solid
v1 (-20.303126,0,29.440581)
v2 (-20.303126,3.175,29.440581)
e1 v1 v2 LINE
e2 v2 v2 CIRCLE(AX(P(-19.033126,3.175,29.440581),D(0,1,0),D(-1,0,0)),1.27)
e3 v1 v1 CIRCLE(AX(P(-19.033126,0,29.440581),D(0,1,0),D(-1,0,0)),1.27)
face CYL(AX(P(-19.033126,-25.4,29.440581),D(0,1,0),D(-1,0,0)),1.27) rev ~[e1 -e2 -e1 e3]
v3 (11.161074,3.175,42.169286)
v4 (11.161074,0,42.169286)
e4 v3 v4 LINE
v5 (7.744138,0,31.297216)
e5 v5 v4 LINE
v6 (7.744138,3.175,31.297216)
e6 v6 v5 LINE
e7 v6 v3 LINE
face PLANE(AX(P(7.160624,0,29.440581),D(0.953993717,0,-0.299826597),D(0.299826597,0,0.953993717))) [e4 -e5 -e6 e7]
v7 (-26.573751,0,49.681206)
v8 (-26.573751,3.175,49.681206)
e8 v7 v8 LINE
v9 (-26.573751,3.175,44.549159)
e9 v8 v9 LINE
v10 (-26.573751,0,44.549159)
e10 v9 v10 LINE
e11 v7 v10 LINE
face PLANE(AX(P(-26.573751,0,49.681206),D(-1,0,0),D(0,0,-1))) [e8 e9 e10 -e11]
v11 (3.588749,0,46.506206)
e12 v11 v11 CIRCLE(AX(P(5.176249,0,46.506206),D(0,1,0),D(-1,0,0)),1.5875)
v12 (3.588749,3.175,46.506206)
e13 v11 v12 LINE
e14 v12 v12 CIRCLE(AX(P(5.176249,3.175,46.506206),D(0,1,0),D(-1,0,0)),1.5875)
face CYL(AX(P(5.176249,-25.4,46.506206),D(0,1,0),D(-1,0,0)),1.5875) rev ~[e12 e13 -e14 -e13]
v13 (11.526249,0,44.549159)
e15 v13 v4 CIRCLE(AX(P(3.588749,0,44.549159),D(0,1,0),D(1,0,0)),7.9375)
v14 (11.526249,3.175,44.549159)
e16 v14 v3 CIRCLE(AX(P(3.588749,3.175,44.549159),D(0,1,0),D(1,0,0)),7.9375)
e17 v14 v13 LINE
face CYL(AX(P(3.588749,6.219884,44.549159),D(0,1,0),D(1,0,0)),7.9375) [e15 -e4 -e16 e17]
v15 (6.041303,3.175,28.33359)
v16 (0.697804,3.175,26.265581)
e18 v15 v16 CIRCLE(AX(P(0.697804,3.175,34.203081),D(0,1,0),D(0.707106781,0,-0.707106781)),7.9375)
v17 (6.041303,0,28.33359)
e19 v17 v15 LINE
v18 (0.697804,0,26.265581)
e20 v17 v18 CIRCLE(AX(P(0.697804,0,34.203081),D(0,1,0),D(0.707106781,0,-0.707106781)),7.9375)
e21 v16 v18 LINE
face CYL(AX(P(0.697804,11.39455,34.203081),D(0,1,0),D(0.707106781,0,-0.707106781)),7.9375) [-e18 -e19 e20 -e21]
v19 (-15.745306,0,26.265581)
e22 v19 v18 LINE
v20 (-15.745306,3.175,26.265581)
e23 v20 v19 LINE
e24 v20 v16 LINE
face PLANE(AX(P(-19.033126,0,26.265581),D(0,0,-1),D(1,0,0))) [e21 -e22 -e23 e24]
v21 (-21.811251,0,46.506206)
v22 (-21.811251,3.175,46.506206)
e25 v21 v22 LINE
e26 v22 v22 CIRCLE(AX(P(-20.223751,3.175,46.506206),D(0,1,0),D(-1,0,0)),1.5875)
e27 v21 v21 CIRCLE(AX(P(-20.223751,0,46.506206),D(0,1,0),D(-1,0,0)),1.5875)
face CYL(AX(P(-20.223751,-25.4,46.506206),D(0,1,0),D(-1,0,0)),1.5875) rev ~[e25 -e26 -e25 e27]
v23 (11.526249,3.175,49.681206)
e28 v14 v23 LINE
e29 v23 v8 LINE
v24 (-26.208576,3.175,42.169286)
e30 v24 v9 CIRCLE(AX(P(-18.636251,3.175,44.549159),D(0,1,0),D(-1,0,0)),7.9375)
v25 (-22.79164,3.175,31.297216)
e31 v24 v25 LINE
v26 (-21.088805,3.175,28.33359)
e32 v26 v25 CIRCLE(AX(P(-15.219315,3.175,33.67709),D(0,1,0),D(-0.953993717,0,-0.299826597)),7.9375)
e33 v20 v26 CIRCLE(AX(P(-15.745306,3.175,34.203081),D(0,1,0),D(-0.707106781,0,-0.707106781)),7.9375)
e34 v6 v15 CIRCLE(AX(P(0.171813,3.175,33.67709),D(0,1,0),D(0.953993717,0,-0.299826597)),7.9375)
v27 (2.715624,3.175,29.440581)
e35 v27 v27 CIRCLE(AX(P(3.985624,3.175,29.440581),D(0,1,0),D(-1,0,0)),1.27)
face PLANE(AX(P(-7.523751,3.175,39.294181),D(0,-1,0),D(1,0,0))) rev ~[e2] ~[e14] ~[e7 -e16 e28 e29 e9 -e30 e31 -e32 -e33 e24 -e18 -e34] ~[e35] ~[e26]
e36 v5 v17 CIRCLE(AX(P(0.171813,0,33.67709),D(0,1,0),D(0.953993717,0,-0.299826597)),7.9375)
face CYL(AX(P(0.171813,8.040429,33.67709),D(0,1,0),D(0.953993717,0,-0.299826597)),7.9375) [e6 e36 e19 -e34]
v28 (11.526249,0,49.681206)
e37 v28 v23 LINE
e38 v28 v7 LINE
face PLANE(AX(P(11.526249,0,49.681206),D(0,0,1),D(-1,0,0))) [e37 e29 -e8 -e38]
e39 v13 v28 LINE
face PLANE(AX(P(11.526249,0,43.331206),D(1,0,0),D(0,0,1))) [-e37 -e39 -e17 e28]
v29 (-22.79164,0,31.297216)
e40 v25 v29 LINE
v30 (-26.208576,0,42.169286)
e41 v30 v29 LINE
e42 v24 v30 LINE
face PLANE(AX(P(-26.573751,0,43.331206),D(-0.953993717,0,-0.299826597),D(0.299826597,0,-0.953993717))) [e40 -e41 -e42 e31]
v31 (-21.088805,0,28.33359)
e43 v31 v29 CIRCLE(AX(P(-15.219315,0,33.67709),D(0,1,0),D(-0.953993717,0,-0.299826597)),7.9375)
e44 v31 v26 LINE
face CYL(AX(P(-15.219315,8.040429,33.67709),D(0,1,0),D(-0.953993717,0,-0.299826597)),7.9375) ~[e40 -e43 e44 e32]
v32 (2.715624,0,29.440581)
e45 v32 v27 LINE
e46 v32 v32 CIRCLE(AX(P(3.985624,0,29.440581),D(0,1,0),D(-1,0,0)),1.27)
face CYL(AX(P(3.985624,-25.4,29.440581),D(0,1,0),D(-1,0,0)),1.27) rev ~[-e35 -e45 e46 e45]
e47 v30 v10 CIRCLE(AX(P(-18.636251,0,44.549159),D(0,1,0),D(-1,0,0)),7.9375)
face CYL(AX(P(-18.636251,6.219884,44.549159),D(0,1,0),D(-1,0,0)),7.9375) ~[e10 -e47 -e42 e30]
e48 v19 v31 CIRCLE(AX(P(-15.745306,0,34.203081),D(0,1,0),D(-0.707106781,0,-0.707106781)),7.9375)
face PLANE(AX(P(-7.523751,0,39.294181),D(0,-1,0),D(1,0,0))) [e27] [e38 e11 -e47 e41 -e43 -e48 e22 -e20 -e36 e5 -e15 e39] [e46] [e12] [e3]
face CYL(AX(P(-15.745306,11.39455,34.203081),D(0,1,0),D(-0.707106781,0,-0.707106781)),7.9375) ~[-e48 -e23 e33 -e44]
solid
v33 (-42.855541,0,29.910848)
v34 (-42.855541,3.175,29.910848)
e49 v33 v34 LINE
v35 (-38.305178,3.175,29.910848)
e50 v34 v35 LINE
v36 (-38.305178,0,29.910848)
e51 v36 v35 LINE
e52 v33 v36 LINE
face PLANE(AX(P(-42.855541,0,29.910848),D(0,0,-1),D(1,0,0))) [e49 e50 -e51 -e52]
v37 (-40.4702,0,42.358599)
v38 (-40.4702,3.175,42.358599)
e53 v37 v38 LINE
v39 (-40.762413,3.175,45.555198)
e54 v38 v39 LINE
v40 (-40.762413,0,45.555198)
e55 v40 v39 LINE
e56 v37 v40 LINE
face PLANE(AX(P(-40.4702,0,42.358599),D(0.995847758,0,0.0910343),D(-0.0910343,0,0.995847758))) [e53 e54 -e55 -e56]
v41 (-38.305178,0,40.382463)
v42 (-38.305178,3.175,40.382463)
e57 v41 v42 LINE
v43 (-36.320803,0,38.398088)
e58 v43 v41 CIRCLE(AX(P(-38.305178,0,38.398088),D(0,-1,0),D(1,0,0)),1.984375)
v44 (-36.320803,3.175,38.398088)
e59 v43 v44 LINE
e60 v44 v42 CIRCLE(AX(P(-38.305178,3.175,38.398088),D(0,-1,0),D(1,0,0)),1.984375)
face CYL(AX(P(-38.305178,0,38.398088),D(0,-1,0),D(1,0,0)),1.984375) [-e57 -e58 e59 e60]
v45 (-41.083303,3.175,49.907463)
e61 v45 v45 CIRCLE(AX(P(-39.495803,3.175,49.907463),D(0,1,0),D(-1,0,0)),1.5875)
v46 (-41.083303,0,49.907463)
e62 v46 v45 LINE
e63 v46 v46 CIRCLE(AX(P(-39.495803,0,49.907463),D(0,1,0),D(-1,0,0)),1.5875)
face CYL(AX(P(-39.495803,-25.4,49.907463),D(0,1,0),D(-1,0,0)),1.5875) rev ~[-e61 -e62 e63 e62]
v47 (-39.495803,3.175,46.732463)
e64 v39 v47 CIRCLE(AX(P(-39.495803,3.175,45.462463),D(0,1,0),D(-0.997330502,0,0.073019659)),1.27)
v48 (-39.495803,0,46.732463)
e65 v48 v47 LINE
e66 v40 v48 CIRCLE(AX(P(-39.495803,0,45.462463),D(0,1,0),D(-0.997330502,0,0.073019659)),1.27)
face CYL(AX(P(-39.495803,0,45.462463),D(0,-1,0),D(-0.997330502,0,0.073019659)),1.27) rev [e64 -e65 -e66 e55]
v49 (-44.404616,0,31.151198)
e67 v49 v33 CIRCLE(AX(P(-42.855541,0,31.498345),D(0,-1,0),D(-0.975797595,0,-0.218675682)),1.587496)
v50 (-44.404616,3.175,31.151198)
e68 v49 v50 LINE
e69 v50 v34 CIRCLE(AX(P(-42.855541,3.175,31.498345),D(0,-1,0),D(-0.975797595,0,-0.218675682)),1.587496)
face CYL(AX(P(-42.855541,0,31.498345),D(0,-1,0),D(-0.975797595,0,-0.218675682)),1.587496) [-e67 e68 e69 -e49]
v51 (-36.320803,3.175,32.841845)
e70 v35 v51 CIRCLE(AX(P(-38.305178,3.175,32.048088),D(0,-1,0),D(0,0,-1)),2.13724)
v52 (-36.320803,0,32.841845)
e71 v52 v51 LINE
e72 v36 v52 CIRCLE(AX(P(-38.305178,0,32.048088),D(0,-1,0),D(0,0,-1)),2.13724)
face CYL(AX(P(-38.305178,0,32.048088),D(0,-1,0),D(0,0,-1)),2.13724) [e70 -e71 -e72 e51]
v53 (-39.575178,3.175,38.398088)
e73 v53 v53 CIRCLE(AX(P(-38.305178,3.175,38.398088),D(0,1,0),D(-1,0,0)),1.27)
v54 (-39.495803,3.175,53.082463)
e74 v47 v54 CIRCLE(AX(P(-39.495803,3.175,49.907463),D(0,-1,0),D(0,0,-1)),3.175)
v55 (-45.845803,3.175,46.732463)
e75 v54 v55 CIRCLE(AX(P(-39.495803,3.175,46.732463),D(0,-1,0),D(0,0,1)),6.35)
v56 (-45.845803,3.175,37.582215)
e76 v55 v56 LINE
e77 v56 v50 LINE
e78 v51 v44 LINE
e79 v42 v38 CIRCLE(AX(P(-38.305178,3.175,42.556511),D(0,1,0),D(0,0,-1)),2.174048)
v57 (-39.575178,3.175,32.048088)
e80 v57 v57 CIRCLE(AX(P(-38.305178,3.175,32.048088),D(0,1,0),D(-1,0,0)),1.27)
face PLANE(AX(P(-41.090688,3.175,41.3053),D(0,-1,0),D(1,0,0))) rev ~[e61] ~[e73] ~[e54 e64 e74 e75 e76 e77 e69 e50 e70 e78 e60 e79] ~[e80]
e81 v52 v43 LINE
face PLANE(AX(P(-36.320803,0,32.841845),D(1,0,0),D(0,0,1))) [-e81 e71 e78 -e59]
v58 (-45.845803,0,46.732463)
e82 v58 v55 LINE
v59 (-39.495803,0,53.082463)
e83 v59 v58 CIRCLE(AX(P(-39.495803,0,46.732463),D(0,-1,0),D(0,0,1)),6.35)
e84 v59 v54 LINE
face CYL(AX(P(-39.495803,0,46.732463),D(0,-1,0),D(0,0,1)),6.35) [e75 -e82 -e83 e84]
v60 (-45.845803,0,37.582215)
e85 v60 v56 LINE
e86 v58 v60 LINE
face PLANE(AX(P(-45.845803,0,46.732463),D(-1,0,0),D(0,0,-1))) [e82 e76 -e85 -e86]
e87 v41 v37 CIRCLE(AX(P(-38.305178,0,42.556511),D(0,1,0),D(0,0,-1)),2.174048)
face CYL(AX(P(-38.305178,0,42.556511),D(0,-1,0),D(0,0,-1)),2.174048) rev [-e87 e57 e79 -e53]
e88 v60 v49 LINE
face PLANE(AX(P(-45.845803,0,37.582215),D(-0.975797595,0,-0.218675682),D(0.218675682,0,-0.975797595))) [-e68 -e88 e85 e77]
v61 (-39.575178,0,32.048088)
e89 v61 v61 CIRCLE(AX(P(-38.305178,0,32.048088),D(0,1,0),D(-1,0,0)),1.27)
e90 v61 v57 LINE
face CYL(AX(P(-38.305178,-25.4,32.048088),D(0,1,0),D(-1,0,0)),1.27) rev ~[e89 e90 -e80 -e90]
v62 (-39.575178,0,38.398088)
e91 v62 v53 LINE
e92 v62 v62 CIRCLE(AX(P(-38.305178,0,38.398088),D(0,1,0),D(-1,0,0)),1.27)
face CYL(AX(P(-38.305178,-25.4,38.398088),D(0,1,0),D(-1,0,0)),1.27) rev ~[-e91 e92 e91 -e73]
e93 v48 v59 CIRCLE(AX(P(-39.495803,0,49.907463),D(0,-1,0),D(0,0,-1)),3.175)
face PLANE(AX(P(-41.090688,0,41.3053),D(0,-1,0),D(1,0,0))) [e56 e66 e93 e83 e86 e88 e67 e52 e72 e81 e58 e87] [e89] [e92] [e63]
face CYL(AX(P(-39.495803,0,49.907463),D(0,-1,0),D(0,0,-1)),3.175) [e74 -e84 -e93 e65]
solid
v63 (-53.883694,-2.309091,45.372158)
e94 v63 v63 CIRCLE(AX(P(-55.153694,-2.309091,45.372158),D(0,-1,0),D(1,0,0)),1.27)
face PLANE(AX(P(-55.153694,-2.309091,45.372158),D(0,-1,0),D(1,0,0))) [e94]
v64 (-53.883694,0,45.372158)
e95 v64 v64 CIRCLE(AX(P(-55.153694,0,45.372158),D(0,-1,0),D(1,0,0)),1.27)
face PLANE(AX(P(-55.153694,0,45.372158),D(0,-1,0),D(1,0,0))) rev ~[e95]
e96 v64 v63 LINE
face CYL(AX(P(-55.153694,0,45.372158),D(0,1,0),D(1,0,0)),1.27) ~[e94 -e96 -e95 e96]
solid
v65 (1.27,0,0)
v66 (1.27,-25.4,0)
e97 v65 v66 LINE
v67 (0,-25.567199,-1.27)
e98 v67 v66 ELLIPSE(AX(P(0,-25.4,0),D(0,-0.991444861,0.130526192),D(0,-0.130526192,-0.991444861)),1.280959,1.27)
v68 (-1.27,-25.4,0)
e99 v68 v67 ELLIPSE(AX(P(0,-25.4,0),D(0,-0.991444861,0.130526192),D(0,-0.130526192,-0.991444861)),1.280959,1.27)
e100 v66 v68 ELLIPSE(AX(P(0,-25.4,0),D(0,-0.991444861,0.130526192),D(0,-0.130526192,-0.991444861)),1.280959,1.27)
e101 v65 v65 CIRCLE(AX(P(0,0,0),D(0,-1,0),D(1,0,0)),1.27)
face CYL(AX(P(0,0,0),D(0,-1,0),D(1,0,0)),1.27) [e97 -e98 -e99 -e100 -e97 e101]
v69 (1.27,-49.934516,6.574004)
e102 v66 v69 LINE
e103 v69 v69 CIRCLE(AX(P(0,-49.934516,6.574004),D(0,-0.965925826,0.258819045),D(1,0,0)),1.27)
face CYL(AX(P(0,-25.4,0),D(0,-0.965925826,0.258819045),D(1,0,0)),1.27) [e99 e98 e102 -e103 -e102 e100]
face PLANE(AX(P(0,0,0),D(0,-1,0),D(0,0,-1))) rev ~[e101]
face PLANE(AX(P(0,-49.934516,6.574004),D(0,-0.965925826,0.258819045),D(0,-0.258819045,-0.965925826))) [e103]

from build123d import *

# Parameters (mm, degrees)
F1_DEPTH    = 3.175
F2_D        = 3.175
F2_DEPTH    = 25.4
F2_TIP      = 0.9538662327
F3_D        = 2.54
F3_DEPTH    = 25.4
F3_TIP      = 0.7630929862
F5_DEPTH    = 3.175
F6_D        = 3.175
F6_DEPTH    = 25.4
F6_TIP      = 0.9538662327
F7_D        = 2.54
F7_DEPTH    = 25.4
F7_TIP      = 0.7630929862
F8_T1_DEPTH = 19.6141007567
F8_T3_DEPTH = 12.9058575482
F8_T5_DEPTH = 9.2647678202
F9_R        = 1.27
F10_DEPTH   = 2.3090909091
F11_R       = 1.27


# Not quite as in the source:
# - a fillet or chamfer that OpenCascade refuses, or shapes differently, is made with other operations: its cross-section is extruded or revolved along the edge and cut away or added


with BuildPart() as f1:
    # F0 (on Front) → F1 (new body)
    with BuildSketch(Plane.XZ):
        with BuildLine():
            ThreePointArc((-40.7624131311, 45.5551980838), (-40.3604208215, 46.3926978741), (-39.4958033942, 46.7324631164))
            ThreePointArc((-39.4958033942, 46.7324631164), (-36.3208033942, 49.9074631164), (-39.4958033942, 53.0824631164))
            ThreePointArc((-39.4958033942, 53.0824631164), (-43.9859314547, 51.222591177), (-45.8458033942, 46.7324631164))
            Line((-45.8458033942, 46.7324631164), (-45.8458033942, 37.5822147164))
            Line((-45.8458033942, 37.5822147164), (-44.4046161923, 31.1511978093))
            ThreePointArc((-44.4046161923, 31.1511978093), (-43.8477734395, 30.2591434316), (-42.8555409547, 29.9108482117))
            Line((-42.8555409547, 29.9108482117), (-38.3051783942, 29.9108482117))
            ThreePointArc((-38.3051783942, 29.9108482117), (-36.5353982281, 30.8498925673), (-36.3208033942, 32.841845176))
            Line((-36.3208033942, 32.841845176), (-36.3208033942, 38.3980881164))
            ThreePointArc((-36.3208033942, 38.3980881164), (-36.9020133752, 39.8012531354), (-38.3051783942, 40.3824631164))
            ThreePointArc((-38.3051783942, 40.3824631164), (-39.7708205612, 40.950778212), (-40.4701995839, 42.3585985103))
            Line((-40.4701995839, 42.3585985103), (-40.7624131311, 45.5551980838))
        make_face()
    extrude(amount=-F1_DEPTH)

    # F2
    with Locations(Plane.XZ):
        with Locations((-39.4958033942, 49.9074631164)):
            Hole(F2_D / 2, depth=F2_DEPTH)
            with Locations((0, 0, -(F2_DEPTH + F2_TIP / 2))):  # 118° drill point
                Cone(0, F2_D / 2, F2_TIP, mode=Mode.SUBTRACT)

    # F3
    with Locations(Plane.XZ):
        with Locations((-38.3051783942, 38.3980881164), (-38.3051783942, 32.0480881164)):
            Hole(F3_D / 2, depth=F3_DEPTH)
            with Locations((0, 0, -(F3_DEPTH + F3_TIP / 2))):  # 118° drill point
                Cone(0, F3_D / 2, F3_TIP, mode=Mode.SUBTRACT)


with BuildPart() as f5:
    # F4 (on Front) → F5 (new body)
    with BuildSketch(Plane.XZ):
        Polygon((11.5262488782, 49.6812058449), (-26.5737511218, 49.6812058449), (-26.5737511218, 46.5062058449), (-26.5737511218, 43.3312058449), (-22.2081261218, 29.4405808449), (-19.0331261218, 26.2655808449), (3.9856238782, 26.2655808449), (7.1606238782, 29.4405808449), (11.5262488782, 43.3312058449), (11.5262488782, 46.5062058449), align=None)
    extrude(amount=-F5_DEPTH)

    # F6
    with Locations(Plane.XZ):
        with Locations((-20.2237511218, 46.5062058449), (5.1762488782, 46.5062058449)):
            Hole(F6_D / 2, depth=F6_DEPTH)
            with Locations((0, 0, -(F6_DEPTH + F6_TIP / 2))):  # 118° drill point
                Cone(0, F6_D / 2, F6_TIP, mode=Mode.SUBTRACT)

    # F7
    with Locations(Plane.XZ):
        with Locations((-19.0331261218, 29.4405808449), (3.9856238782, 29.4405808449)):
            Hole(F7_D / 2, depth=F7_DEPTH)
            with Locations((0, 0, -(F7_DEPTH + F7_TIP / 2))):  # 118° drill point
                Cone(0, F7_D / 2, F7_TIP, mode=Mode.SUBTRACT)

    # F8: fillet of radius 7.9375 on 6 edges, made by hand

    # F8_s2 → F8_t1 (cut)
    with BuildSketch(Plane.XZ.offset(-11.3945503783)):
        with BuildLine():
            ThreePointArc((6.3104638026, 28.5904207692), (3.7353534713, 26.8697870556), (0.6978037269, 26.2655808449))
            Line((0.6978037269, 26.2655808449), (3.9856238782, 26.2655808449))
            Line((3.9856238782, 26.2655808449), (6.3104638026, 28.5904207692))
        make_face()
        with BuildLine():
            ThreePointArc((-21.3579660461, 28.5904207692), (-18.7828557148, 26.8697870556), (-15.7453059704, 26.2655808449))
            Line((-15.7453059704, 26.2655808449), (-19.0331261218, 26.2655808449))
            Line((-19.0331261218, 26.2655808449), (-21.3579660461, 28.5904207692))
        make_face()
    extrude(amount=F8_T1_DEPTH, mode=Mode.SUBTRACT)

    # F8_s4 → F8_t3 (cut)
    with BuildSketch(Plane.XZ.offset(-8.0404287741)):
        with BuildLine():
            ThreePointArc((7.7441378587, 31.2972162371), (6.9595727284, 29.562454936), (5.7844728064, 28.0644297731))
            Line((5.7844728064, 28.0644297731), (7.1606238782, 29.4405808449))
            Line((7.1606238782, 29.4405808449), (7.7441378587, 31.2972162371))
        make_face()
        with BuildLine():
            ThreePointArc((-22.7916401022, 31.2972162371), (-22.0070749719, 29.562454936), (-20.8319750499, 28.0644297731))
            Line((-20.8319750499, 28.0644297731), (-22.2081261218, 29.4405808449))
            Line((-22.2081261218, 29.4405808449), (-22.7916401022, 31.2972162371))
        make_face()
    extrude(amount=F8_T3_DEPTH, mode=Mode.SUBTRACT)

    # F8_s6 → F8_t5 (cut)
    with BuildSketch(Plane.XZ.offset(-6.2198839101)):
        with BuildLine():
            ThreePointArc((11.5262488782, 44.5491594089), (11.434424023, 43.3452957233), (11.1610740061, 42.1692857973))
            Line((11.1610740061, 42.1692857973), (11.5262488782, 43.3312058449))
            Line((11.5262488782, 43.3312058449), (11.5262488782, 44.5491594089))
        make_face()
        with BuildLine():
            ThreePointArc((-26.5737511218, 44.5491594089), (-26.4819262665, 43.3452957233), (-26.2085762497, 42.1692857973))
            Line((-26.2085762497, 42.1692857973), (-26.5737511218, 43.3312058449))
            Line((-26.5737511218, 43.3312058449), (-26.5737511218, 44.5491594089))
        make_face()
    extrude(amount=F8_T5_DEPTH, mode=Mode.SUBTRACT)


with BuildPart() as f10:
    # F9 (on Front) → F10 (new body)
    with BuildSketch(Plane.XZ):
        with Locations((-55.1536940038, 45.372158289)):
            Circle(F9_R)
    extrude(amount=F10_DEPTH)


with BuildPart() as f13:
    # F13: sweep along a path in F12
    with BuildLine(Plane.YZ) as f13_path:
        Line((0, 0), (-25.4, 0))
        Line((-25.4, 0), (-49.9345159877, 6.5740037456))
    # F11 (on Front) → F13 (sweep)
    with BuildSketch(Plane.XZ):
        Circle(F11_R)
    sweep(path=f13_path.line, transition=Transition.RIGHT)


solid = Compound([f1.part, f5.part, f10.part, f13.part])
